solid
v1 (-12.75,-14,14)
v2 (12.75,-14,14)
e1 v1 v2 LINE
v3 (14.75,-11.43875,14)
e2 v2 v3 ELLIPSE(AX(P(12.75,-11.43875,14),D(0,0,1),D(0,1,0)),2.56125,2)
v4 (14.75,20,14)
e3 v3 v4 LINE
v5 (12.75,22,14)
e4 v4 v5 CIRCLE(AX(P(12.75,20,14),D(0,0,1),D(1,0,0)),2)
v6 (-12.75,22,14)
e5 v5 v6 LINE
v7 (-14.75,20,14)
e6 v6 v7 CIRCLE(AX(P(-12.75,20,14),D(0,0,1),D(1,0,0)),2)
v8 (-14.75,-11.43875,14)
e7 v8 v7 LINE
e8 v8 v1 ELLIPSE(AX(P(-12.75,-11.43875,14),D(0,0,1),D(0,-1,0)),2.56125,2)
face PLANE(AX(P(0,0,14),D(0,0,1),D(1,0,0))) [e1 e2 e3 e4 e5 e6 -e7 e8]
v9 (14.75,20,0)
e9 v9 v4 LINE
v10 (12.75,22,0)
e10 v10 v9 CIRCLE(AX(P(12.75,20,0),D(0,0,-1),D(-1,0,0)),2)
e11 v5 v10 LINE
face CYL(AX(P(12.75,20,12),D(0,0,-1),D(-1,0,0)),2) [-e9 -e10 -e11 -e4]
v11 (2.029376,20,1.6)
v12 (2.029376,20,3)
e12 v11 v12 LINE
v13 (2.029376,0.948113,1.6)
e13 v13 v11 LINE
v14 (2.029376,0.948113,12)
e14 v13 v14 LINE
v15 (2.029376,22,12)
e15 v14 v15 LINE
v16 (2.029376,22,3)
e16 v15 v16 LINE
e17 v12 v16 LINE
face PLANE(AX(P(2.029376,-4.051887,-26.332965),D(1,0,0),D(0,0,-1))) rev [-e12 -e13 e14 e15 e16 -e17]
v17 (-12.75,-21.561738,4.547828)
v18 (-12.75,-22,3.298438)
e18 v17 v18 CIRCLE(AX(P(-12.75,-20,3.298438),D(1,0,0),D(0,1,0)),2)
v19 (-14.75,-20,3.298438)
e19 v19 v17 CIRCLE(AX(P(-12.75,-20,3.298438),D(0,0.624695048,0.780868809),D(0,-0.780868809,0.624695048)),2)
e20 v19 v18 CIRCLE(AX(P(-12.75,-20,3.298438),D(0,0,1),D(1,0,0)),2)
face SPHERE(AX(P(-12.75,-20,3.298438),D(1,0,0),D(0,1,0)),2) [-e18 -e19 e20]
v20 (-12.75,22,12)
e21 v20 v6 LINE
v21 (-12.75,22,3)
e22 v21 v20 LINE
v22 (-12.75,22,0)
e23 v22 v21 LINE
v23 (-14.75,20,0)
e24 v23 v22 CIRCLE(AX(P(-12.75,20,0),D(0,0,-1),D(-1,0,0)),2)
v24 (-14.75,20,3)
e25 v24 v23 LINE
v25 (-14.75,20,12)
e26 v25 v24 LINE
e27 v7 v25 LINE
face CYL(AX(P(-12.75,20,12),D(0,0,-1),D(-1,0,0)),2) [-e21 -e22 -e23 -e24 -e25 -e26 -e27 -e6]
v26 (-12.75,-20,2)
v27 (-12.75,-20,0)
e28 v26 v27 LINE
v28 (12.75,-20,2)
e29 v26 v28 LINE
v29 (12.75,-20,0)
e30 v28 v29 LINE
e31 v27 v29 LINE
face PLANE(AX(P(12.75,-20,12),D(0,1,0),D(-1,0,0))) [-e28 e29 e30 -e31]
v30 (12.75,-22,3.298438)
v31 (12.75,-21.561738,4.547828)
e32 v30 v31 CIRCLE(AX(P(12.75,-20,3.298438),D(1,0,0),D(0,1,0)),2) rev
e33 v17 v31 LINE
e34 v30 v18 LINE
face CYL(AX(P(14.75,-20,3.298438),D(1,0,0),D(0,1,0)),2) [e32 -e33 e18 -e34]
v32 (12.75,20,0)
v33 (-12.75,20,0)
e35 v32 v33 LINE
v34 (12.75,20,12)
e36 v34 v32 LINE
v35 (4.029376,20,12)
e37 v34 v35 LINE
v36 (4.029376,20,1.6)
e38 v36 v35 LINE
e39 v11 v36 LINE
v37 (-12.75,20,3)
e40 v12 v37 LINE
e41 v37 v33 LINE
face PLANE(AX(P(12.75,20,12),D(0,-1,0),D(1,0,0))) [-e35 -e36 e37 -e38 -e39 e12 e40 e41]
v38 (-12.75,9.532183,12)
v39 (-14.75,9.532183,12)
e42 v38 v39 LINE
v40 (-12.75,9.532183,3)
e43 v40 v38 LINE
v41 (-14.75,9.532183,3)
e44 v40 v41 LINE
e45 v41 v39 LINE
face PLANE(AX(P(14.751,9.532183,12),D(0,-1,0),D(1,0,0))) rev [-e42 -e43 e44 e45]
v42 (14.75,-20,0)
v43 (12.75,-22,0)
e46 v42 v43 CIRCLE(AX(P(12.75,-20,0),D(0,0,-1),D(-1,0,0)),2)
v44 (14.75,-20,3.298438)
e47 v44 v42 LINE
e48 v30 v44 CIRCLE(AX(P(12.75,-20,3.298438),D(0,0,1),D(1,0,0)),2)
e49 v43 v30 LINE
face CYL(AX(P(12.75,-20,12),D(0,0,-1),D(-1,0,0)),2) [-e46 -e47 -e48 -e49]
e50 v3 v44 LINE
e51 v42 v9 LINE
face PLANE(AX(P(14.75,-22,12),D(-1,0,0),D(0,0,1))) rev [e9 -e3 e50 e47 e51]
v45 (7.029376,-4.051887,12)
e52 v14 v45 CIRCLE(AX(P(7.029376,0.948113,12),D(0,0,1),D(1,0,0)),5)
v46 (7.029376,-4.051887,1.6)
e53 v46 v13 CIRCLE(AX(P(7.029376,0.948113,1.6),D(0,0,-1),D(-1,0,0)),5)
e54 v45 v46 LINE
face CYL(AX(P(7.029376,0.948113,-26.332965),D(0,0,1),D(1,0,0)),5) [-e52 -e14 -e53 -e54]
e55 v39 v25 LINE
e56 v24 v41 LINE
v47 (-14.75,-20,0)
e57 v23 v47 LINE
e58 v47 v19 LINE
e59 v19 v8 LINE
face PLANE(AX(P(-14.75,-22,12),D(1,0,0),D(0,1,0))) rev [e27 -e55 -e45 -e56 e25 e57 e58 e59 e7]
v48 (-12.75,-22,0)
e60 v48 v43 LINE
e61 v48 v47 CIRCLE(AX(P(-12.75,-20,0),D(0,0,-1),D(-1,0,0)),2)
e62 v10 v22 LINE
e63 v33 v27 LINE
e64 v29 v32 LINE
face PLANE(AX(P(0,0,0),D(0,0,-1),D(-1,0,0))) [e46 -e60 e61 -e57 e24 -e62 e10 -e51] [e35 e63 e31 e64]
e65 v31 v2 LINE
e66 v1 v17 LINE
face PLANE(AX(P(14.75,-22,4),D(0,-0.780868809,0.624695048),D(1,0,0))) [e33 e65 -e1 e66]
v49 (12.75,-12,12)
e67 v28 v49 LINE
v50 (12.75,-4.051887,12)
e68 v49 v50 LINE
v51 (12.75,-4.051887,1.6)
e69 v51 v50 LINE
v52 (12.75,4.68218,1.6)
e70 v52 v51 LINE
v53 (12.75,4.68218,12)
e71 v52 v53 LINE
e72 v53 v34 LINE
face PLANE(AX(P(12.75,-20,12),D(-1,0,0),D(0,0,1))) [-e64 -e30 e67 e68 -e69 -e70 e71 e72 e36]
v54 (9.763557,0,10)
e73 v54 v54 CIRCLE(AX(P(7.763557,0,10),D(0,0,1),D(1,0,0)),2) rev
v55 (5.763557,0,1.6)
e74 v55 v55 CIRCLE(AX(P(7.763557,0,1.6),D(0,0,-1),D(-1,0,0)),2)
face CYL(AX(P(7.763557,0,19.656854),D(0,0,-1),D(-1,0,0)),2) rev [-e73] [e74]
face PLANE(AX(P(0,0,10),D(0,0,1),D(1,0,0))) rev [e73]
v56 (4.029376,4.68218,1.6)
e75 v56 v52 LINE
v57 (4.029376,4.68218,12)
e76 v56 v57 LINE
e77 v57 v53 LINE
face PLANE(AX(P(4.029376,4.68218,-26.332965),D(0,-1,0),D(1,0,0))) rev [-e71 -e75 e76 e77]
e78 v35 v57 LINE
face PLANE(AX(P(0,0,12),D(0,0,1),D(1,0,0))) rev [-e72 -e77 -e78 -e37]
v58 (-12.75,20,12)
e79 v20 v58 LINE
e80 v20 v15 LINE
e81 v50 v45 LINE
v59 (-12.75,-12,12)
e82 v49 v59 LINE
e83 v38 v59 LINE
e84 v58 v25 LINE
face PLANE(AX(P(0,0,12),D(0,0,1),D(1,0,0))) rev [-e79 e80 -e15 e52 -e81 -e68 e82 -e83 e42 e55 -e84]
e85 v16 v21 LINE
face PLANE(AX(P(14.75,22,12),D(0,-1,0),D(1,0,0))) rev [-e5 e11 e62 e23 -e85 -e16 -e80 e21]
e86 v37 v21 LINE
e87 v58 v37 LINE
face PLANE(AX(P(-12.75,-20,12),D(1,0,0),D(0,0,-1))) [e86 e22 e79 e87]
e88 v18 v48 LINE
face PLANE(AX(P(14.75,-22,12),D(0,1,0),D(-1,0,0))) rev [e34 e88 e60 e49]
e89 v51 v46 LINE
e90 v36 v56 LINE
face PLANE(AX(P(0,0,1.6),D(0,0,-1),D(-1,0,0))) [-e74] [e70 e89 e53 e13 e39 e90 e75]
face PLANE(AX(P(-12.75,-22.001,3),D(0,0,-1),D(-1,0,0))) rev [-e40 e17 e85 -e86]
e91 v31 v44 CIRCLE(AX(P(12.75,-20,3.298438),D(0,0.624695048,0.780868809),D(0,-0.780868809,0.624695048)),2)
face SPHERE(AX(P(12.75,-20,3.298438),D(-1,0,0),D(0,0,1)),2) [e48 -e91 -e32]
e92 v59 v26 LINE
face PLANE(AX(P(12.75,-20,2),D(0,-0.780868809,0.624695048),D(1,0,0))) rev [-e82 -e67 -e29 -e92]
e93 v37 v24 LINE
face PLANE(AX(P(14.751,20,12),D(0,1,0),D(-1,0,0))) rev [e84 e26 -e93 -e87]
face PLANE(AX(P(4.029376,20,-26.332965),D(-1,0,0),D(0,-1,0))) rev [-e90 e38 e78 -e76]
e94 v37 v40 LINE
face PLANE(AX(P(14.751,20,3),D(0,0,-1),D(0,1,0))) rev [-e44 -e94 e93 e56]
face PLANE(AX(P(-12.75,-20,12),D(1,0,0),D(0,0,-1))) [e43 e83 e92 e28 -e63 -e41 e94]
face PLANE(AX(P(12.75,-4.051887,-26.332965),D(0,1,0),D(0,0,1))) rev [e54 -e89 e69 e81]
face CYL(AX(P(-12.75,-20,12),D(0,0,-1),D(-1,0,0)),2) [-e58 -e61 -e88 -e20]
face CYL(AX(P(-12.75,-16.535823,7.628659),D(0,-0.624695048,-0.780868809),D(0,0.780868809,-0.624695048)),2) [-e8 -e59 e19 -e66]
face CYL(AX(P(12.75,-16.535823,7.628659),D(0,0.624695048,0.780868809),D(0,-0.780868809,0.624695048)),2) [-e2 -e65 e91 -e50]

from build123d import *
from OCP.BRepFilletAPI import BRepFilletAPI_MakeChamfer

# Parameters (mm, degrees)
SKETCH1_W           = 29.5
SKETCH1_H           = 44
SKETCH1_W_2         = 25.5
SKETCH1_H_2         = 40
BOSS_EXTRUDE1_DEPTH = 12
BOSS_EXTRUDE2_START = 12
SKETCH1_2_W         = 29.5
SKETCH1_2_H         = 44
SKETCH1_2_W_2       = 25.5
SKETCH1_2_H_2       = 40
BOSS_EXTRUDE2_DEPTH = 2
BOSS_EXTRUDE3_DEPTH = 10.4
CUT_EXTRUDE1_REACH  = 50.472
SKETCH3_W           = 14.779376432
SKETCH3_H           = 9
CUT_EXTRUDE2_REACH  = 41.373
SKETCH4_W           = 9
SKETCH4_H           = 10.467816728
FILLET1_R           = 2
FILLET2_SIZE        = 8
FILLET2_SIZE2       = 10
SKETCH6_R           = 2
CUT_EXTRUDE3_DEPTH  = 8.4
FILLET3_R           = 5
FILLET5_R           = 2
FILLET6_R           = 2


with BuildPart() as part:
    # Sketch1 → Boss-Extrude1 (new body)
    with BuildSketch(Plane.XY):
        Rectangle(SKETCH1_W, SKETCH1_H)
        Rectangle(SKETCH1_W_2, SKETCH1_H_2, mode=Mode.SUBTRACT)
    extrude(amount=BOSS_EXTRUDE1_DEPTH)

    # Sketch1<2> → Boss-Extrude2 (add)
    # profile 1 of 2: a face of its own
    with BuildSketch(Plane.XY.offset(BOSS_EXTRUDE2_START)):
        Rectangle(SKETCH1_2_W, SKETCH1_2_H)
        Rectangle(SKETCH1_2_W_2, SKETCH1_2_H_2, mode=Mode.SUBTRACT)
    # profile 2 of 2: a face of its own
    with BuildSketch(Plane.XY.offset(BOSS_EXTRUDE2_START)):
        Rectangle(SKETCH1_2_W_2, SKETCH1_2_H_2)
    extrude(amount=BOSS_EXTRUDE2_DEPTH)

    # Sketch2 → Boss-Extrude3 (add)
    with BuildSketch(Plane(origin=(0, 0, 12), x_dir=(-1, 0, 0), z_dir=(0, 0, -1))):
        Polygon((-4.029376432, 20), (-4.029376432, 4.682180434), (-12.75, 4.682180434), (-12.75, -4.051886914), (-2.029376432, -4.051886914), (-2.029376432, 20), align=None)
    extrude(amount=BOSS_EXTRUDE3_DEPTH)

    # Sketch3 → Cut-Extrude1 (cut, up to next)
    with BuildSketch(Plane(origin=(0, 22, 0), x_dir=(1, 0, 0), z_dir=(0, 1, 0)), mode=Mode.PRIVATE) as cut_extrude1_sk1:
        with Locations((-5.360311784, -7.5)):
            Rectangle(SKETCH3_W, SKETCH3_H)
    cut_extrude1_tool1 = extrude(cut_extrude1_sk1.sketch, amount=-CUT_EXTRUDE1_REACH, mode=Mode.PRIVATE) & part.part
    add(cut_extrude1_tool1.solids().sort_by_distance((-5.360312, 22, 7.5))[0], mode=Mode.SUBTRACT)

    # Sketch4 → Cut-Extrude2 (cut, up to next)
    with BuildSketch(Plane.ZY.offset(14.75), mode=Mode.PRIVATE) as cut_extrude2_sk1:
        with Locations((7.5, 14.766091636)):
            Rectangle(SKETCH4_W, SKETCH4_H)
    cut_extrude2_tool1 = extrude(cut_extrude2_sk1.sketch, amount=-CUT_EXTRUDE2_REACH, mode=Mode.PRIVATE) & part.part
    add(cut_extrude2_tool1.solids().sort_by_distance((-14.75, 14.766092, 7.5))[0], mode=Mode.SUBTRACT)

    # Fillet1
    fillet1_edges = [part.edges().sort_by_distance(p)[0] for p in [
        (-14.75, 22, 7),
        (14.75, 22, 7),
    ]]
    fillet(fillet1_edges, radius=FILLET1_R - 0.0001)  # a hair under: the kernel refuses the full size

    # Fillet2: one chamfer whose edges measure the first distance from different faces: ONE call of the kernel's chamfer builder (chamfer() names one face for all edges)
    fillet2_edges_1 = [part.edges().sort_by_distance(p)[0] for p in [
        (0, -20, 12),
    ]]
    fillet2_side_1 = [part.faces().sort_by_distance(p)[0] for p in [
        (-2.893950715, -1.385908374, 12),
    ]]
    fillet2_edges_2 = [part.edges().sort_by_distance(p)[0] for p in [
        (0, -22, 14),
    ]]
    fillet2_side_2 = [part.faces().sort_by_distance(p)[0] for p in [
        (0, -0.028542601, 14),
    ]]
    fillet2 = BRepFilletAPI_MakeChamfer(part.part.solid().wrapped)
    for e in fillet2_edges_1:
        fillet2.Add(FILLET2_SIZE, FILLET2_SIZE2, e.wrapped, fillet2_side_1[0].wrapped)  # the first distance lies on this face
    for e in fillet2_edges_2:
        fillet2.Add(FILLET2_SIZE, FILLET2_SIZE2, e.wrapped, fillet2_side_2[0].wrapped)  # the first distance lies on this face
    add(Compound.cast(fillet2.Shape()), mode=Mode.REPLACE)

    # Sketch6 → Cut-Extrude3 (cut)
    with BuildSketch(Plane(origin=(0, 0, 1.6), x_dir=(-1, 0, 0), z_dir=(0, 0, -1))):
        with Locations((-7.7635572, 0)):
            Circle(SKETCH6_R)
    extrude(amount=-CUT_EXTRUDE3_DEPTH, mode=Mode.SUBTRACT)

    # Fillet3
    fillet3_edges = [part.edges().sort_by_distance(p)[0] for p in [
        (2.029376432, -4.051886914, 6.8),
    ]]
    fillet(fillet3_edges, radius=FILLET3_R)

    # Fillet5
    fillet5_edges = [part.edges().sort_by_distance(p)[0] for p in [
        (0, -22, 4),
    ]]
    fillet(fillet5_edges, radius=FILLET5_R)

    # Fillet6
    fillet6_edges = [part.edges().sort_by_distance(p)[0] for p in [
        (14.75, -17.780868809, 9.273913988),
        (14.75, -22, 1.649218941),
        (-14.75, -22, 1.649218941),
        (-14.75, -17.780868809, 9.273913988),
        (-14.75, -21.887256638, 3.960451764),
        (14.75, -21.887256638, 3.960451764),
    ]]
    fillet(fillet6_edges, radius=FILLET6_R)


solid = part.part
